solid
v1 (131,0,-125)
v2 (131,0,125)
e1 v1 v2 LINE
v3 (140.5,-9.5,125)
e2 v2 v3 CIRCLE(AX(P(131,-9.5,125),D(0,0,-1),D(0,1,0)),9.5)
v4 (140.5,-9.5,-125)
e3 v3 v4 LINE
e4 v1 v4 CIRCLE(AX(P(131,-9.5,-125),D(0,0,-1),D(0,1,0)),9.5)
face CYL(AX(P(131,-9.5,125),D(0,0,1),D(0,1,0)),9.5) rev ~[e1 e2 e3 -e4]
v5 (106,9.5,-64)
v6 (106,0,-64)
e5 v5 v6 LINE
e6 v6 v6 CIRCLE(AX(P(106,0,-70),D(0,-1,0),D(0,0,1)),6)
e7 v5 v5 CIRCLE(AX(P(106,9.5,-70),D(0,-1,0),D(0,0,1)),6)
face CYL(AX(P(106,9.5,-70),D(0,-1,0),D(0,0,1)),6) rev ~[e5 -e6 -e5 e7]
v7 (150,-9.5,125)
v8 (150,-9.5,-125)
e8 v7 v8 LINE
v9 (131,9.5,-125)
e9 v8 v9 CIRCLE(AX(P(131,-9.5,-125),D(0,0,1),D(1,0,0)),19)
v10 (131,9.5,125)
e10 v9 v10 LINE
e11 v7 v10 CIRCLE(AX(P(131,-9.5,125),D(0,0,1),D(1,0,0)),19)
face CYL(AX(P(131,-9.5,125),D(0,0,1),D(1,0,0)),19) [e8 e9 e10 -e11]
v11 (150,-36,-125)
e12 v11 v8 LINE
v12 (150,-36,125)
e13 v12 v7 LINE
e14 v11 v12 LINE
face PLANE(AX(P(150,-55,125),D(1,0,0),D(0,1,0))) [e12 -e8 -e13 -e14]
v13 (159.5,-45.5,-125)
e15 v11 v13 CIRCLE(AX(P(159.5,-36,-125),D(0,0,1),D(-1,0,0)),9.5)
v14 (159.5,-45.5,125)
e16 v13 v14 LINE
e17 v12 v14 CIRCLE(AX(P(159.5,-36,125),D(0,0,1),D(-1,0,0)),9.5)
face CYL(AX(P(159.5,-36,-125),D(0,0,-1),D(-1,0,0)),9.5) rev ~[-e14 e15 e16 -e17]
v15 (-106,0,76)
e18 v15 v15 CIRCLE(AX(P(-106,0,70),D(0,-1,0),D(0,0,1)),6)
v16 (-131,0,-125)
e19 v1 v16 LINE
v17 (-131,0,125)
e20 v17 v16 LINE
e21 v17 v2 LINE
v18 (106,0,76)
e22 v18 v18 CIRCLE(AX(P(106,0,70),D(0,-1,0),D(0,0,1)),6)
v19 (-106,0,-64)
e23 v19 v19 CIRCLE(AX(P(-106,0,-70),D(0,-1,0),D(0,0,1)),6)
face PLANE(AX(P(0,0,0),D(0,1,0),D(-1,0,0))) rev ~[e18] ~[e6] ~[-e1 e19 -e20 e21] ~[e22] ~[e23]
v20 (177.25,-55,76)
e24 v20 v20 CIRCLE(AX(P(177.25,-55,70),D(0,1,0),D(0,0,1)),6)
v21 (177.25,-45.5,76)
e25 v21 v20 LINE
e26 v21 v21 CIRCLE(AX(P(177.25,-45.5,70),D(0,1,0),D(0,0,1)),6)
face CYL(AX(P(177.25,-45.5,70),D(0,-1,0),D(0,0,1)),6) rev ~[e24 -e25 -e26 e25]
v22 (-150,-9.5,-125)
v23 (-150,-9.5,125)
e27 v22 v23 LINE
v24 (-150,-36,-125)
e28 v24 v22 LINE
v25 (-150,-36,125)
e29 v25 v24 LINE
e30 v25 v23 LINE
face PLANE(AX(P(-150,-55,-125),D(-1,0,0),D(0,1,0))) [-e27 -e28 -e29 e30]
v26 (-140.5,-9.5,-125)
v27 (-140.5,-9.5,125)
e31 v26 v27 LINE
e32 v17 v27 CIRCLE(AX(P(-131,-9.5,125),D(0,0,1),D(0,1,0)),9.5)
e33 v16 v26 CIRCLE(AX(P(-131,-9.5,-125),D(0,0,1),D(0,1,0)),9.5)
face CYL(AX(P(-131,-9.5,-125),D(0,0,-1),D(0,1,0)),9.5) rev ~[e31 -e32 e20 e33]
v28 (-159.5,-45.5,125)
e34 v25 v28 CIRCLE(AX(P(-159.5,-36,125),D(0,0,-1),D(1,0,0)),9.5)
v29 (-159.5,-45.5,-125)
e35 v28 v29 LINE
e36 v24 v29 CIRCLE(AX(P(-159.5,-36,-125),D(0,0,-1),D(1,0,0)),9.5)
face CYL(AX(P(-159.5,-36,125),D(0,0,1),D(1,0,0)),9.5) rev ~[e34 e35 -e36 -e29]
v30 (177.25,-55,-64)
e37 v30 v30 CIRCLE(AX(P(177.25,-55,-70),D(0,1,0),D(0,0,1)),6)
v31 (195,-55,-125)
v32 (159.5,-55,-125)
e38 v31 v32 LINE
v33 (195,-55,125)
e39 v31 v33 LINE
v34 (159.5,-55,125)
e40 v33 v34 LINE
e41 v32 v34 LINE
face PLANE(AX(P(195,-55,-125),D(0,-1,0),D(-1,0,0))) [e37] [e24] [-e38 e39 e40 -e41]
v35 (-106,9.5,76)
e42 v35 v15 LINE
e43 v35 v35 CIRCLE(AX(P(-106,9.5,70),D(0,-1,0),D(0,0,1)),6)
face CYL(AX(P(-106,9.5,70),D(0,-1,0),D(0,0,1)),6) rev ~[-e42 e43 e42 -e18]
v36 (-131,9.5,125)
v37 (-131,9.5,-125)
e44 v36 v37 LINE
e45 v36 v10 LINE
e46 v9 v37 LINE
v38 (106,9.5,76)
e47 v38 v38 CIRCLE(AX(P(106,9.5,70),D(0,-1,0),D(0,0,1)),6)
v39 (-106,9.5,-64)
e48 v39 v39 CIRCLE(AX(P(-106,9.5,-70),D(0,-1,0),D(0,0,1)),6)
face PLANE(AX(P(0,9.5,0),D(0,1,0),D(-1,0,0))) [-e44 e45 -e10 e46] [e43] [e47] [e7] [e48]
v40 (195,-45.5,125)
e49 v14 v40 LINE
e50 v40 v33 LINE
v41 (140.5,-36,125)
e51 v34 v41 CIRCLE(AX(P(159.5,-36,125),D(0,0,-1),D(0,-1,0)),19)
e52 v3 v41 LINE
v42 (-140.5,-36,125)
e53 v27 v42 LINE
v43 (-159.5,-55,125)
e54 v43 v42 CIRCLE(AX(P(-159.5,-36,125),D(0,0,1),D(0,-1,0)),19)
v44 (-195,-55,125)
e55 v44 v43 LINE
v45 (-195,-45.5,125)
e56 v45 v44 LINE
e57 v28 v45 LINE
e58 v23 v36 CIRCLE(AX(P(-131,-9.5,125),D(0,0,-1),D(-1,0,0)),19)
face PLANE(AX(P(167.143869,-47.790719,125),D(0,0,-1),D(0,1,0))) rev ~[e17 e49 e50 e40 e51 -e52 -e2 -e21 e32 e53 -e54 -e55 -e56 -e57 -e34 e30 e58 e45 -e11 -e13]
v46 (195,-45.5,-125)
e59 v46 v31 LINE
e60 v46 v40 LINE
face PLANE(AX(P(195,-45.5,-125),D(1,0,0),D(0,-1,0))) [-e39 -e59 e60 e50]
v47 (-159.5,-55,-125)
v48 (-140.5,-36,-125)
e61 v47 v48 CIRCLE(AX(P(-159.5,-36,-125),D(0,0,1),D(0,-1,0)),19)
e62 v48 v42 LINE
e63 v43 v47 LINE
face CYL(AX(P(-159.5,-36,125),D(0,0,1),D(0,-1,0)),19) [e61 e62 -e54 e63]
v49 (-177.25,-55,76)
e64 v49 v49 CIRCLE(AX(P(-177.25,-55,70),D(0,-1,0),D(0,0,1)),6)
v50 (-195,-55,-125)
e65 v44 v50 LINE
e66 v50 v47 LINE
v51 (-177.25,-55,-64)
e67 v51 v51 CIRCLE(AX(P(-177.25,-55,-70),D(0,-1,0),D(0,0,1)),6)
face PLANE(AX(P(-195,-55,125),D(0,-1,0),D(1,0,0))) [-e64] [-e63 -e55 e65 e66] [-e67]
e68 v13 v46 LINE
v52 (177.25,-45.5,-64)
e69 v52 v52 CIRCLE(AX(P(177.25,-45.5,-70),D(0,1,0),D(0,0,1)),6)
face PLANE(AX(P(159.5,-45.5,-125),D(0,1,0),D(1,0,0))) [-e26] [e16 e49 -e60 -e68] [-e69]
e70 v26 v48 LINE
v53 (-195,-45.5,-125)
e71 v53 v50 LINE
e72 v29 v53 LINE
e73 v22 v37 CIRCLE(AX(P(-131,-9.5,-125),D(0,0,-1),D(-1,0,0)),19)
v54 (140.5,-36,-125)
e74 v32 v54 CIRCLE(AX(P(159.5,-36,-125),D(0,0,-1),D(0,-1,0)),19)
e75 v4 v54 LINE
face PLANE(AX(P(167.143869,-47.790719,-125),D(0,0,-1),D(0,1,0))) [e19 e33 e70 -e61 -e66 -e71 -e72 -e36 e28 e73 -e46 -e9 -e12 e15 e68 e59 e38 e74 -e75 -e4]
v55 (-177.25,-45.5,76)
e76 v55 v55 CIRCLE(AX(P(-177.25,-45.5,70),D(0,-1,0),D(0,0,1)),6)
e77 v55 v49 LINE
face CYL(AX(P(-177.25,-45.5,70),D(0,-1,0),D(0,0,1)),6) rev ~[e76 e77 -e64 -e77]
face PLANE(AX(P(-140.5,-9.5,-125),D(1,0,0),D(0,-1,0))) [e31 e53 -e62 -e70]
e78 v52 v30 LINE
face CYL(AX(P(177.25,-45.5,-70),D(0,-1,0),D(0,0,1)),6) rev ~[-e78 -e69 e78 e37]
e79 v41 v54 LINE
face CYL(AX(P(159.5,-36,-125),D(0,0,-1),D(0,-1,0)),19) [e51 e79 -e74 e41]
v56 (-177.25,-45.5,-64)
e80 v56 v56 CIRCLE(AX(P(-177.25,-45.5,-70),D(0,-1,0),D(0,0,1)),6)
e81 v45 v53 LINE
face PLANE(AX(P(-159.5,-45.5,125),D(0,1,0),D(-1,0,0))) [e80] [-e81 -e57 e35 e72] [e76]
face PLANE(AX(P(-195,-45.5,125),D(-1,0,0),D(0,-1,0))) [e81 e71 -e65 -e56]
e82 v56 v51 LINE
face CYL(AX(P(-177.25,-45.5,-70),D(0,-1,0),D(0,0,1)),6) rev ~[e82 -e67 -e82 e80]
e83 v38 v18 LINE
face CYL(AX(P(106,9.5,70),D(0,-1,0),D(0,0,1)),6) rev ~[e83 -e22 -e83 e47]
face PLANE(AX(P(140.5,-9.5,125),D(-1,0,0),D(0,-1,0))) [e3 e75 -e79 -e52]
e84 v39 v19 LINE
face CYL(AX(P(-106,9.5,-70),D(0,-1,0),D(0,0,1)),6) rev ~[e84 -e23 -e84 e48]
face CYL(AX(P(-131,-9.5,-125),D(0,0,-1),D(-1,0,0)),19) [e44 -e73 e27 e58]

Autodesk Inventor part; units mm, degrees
ref_plane "YZ Plane" through (0, 0, 0) normal (1, 0, 0) x (0, 1, 0)
ref_plane "XZ Plane" through (0, 0, 0) normal (0, 1, 0) x (-1, 0, 0)
ref_plane "XY Plane" through (0, 0, 0) normal (0, 0, 1) x (1, 0, 0)
sketch "Sketch1" plane through (0, 0, 0) normal (0, 1, 0) x (-1, 0, 0)
  line L0 (150, 125) -> (-150, 125)
  line L1 (-150, 125) -> (-150, -125)
  line L2 (-150, -125) -> (150, -125)
  line L3 (150, -125) -> (150, 125)
  point P0 (0, 0)
  dimension "d0" = 300
  dimension "d1" = 250
  dimension "d2" = 125
  dimension "d29" = 150
extrude "Plate1" add sketch "Sketch1" along normal blind 9.5
sketch "Sketch4" plane through (0, 9.5, 0) normal (0, 1, 0) x (1, 0, 0)
  line L0 (-106, -70) -> (106, -70)
  line L1 (106, -70) -> (106, 70)
  line L2 (106, 70) -> (-106, 70)
  line L3 (-106, 70) -> (-106, -70)
  line L4 (-150, -125) -> (-150, 125) projected
  point P0 (0, 0)
  point P1 (-130, -106)
  point P2 (-130, 106)
  dimension "d24" = 140
  dimension "d25" = 212
  dimension "d27" = 70
  dimension "d28" = 106
hole "Hole1" at (-106, 9.5, 70) at (-106, 9.5, -70) at (106, 9.5, 70) at (106, 9.5, -70) direction (0, -1, 0) diameter 12 depth 9.5
sketch "Sketch8" plane through (-140.5, 9.5, 125) normal (-1, 0, 0) x (0, 1, 0)
  line L0 (0, -250) -> (0, 0)
  line L1 (0, 0) -> (-64.5, 0)
  line L2 (-64.5, 0) -> (-64.5, -250)
  line L3 (-64.5, -250) -> (0, -250)
edge flange "Flange5" height 64.5 angle 90 thickness 9.5 bend radius 9.5 thickness toward (-1, 0, 0) relief tear relief width 9.5 relief depth 4.75 edges at (-150, 9.5, 0) wall of the first edge with corners at (-140.5, 9.5, -125) (-140.5, 9.5, 125) (-140.5, -55, 125) (-140.5, -55, -125)
bend "Bend5"
corner "Corner5"
sketch "Sketch9" plane through (140.5, 9.5, -125) normal (1, 0, 0) x (0, -1, 0)
  line L0 (0, 250) -> (0, 0)
  line L1 (0, 0) -> (64.5, 0)
  line L2 (64.5, 0) -> (64.5, 250)
  line L3 (64.5, 250) -> (0, 250)
edge flange "Flange6" height 64.5 angle 90 thickness 9.5 bend radius 9.5 thickness toward (1, 0, 0) relief tear relief width 9.5 relief depth 4.75 edges at (150, 9.5, 0) wall of the first edge with corners at (140.5, 9.5, 125) (140.5, 9.5, -125) (140.5, -55, -125) (140.5, -55, 125)
bend "Bend6"
corner "Corner6"
sketch "Sketch10" plane through (-140.5, -45.5, -125) normal (0, -1, 0) x (-1, 0, 0)
  line L0 (0, 250) -> (0, 0)
  line L1 (0, 0) -> (54.5, 0)
  line L2 (54.5, 0) -> (54.5, 250)
  line L3 (54.5, 250) -> (0, 250)
edge flange "Flange7" height 45 angle 90 thickness 9.5 bend radius 9.5 thickness toward (0, -1, 0) relief tear relief width 9.5 relief depth 4.75 edges at (-140.5, -55, 0) wall of the first edge with corners at (-140.5, -45.5, 125) (-140.5, -45.5, -125) (-195, -45.5, -125) (-195, -45.5, 125)
bend "Bend7"
corner "Corner7"
sketch "Sketch11" plane through (140.5, -45.5, 125) normal (0, -1, 0) x (-1, 0, 0)
  line L0 (0, -250) -> (0, 0)
  line L1 (0, 0) -> (-54.5, 0)
  line L2 (-54.5, 0) -> (-54.5, -250)
  line L3 (-54.5, -250) -> (0, -250)
edge flange "Flange8" height 45 angle 90 thickness 9.5 bend radius 9.5 thickness toward (0, -1, 0) relief tear relief width 9.5 relief depth 4.75 edges at (140.5, -55, 0) wall of the first edge with corners at (140.5, -45.5, -125) (140.5, -45.5, 125) (195, -45.5, 125) (195, -45.5, -125)
bend "Bend8"
corner "Corner8"
sketch "Sketch12" plane through (-195, -45.5, 125) normal (0, 1, 0) x (1, 0, 0)
  line L0 (35.5, 250) -> (0, 250) projected
  line L1 (17.75, 250) -> (17.75, 0)
  line L2 (35.5, 0) -> (0, 0) projected
  line L3 (0, 0) -> (0, 250) projected
  line L4 (0, 195) -> (35.5, 195)
  line L5 (0, 55) -> (35.5, 55)
  line L6 (35.5, 250) -> (35.5, 0) projected
  point P0 (195, 125)
  point P1 (17.75, 195)
  point P2 (17.75, 55)
  dimension "d110" = 55
  dimension "d111" = 55
hole "Hole3" at (-177.25, -45.5, -70) at (-177.25, -45.5, 70) direction (0, -1, 0) diameter 12 depth 9.5
mirror "Mirror2" about plane through (0, 0, 0) normal (1, 0, 0) of "Hole3"
equation "\"d28\" = 0.5 * d25"
equation "\"d35\" = Thickness"
equation "\"d117\" = Thickness"
equation "\"d3\" = Thickness"
equation "\"d69\" = BendReliefWidth"
equation "\"d70\" = BendReliefDepth"
equation "\"d71\" = MinimumRemnant"
equation "\"d72\" = TransitionRadius"
equation "\"d75\" = BendRadius"
equation "\"d76\" = CornerReliefSize"
equation "\"d77\" = GapSize"
equation "\"d78\" = JacobiRadiusSize"
equation "\"d79\" = BendReliefWidth"
equation "\"d80\" = BendReliefDepth"
equation "\"d81\" = MinimumRemnant"
equation "\"d82\" = TransitionRadius"
equation "\"d85\" = BendRadius"
equation "\"d86\" = CornerReliefSize"
equation "\"d87\" = GapSize"
equation "\"d88\" = JacobiRadiusSize"
equation "\"d89\" = BendReliefWidth"
equation "\"d90\" = BendReliefDepth"
equation "\"d91\" = MinimumRemnant"
equation "\"d92\" = TransitionRadius"
equation "\"d95\" = BendRadius"
equation "\"d96\" = CornerReliefSize"
equation "\"d97\" = GapSize"
equation "\"d98\" = JacobiRadiusSize"
equation "\"d99\" = BendReliefWidth"
equation "\"d100\" = BendReliefDepth"
equation "\"d101\" = MinimumRemnant"
equation "\"d102\" = TransitionRadius"
equation "\"d105\" = BendRadius"
equation "\"d106\" = CornerReliefSize"
equation "\"d107\" = GapSize"
equation "\"d108\" = JacobiRadiusSize"
equation "\"d2\" = 0.5 * d1"
equation "\"d29\" = 0.5 * d0"
equation "\"BendRadius\" = Thickness"
equation "\"BendReliefWidth\" = Thickness"
equation "\"BendReliefDepth\" = 0.5 * Thickness"
equation "\"CornerReliefSize\" = 4 * Thickness"
equation "\"MinimumRemnant\" = 2 * Thickness"
equation "\"TransitionRadius\" = BendRadius"
equation "\"JacobiRadiusSize\" = BendRadius"
equation "\"GapSize\" = Thickness"
equation "\"Thickness\" = 9.5"
properties part number "BaseMotor" material "Steel ASTM A36"
